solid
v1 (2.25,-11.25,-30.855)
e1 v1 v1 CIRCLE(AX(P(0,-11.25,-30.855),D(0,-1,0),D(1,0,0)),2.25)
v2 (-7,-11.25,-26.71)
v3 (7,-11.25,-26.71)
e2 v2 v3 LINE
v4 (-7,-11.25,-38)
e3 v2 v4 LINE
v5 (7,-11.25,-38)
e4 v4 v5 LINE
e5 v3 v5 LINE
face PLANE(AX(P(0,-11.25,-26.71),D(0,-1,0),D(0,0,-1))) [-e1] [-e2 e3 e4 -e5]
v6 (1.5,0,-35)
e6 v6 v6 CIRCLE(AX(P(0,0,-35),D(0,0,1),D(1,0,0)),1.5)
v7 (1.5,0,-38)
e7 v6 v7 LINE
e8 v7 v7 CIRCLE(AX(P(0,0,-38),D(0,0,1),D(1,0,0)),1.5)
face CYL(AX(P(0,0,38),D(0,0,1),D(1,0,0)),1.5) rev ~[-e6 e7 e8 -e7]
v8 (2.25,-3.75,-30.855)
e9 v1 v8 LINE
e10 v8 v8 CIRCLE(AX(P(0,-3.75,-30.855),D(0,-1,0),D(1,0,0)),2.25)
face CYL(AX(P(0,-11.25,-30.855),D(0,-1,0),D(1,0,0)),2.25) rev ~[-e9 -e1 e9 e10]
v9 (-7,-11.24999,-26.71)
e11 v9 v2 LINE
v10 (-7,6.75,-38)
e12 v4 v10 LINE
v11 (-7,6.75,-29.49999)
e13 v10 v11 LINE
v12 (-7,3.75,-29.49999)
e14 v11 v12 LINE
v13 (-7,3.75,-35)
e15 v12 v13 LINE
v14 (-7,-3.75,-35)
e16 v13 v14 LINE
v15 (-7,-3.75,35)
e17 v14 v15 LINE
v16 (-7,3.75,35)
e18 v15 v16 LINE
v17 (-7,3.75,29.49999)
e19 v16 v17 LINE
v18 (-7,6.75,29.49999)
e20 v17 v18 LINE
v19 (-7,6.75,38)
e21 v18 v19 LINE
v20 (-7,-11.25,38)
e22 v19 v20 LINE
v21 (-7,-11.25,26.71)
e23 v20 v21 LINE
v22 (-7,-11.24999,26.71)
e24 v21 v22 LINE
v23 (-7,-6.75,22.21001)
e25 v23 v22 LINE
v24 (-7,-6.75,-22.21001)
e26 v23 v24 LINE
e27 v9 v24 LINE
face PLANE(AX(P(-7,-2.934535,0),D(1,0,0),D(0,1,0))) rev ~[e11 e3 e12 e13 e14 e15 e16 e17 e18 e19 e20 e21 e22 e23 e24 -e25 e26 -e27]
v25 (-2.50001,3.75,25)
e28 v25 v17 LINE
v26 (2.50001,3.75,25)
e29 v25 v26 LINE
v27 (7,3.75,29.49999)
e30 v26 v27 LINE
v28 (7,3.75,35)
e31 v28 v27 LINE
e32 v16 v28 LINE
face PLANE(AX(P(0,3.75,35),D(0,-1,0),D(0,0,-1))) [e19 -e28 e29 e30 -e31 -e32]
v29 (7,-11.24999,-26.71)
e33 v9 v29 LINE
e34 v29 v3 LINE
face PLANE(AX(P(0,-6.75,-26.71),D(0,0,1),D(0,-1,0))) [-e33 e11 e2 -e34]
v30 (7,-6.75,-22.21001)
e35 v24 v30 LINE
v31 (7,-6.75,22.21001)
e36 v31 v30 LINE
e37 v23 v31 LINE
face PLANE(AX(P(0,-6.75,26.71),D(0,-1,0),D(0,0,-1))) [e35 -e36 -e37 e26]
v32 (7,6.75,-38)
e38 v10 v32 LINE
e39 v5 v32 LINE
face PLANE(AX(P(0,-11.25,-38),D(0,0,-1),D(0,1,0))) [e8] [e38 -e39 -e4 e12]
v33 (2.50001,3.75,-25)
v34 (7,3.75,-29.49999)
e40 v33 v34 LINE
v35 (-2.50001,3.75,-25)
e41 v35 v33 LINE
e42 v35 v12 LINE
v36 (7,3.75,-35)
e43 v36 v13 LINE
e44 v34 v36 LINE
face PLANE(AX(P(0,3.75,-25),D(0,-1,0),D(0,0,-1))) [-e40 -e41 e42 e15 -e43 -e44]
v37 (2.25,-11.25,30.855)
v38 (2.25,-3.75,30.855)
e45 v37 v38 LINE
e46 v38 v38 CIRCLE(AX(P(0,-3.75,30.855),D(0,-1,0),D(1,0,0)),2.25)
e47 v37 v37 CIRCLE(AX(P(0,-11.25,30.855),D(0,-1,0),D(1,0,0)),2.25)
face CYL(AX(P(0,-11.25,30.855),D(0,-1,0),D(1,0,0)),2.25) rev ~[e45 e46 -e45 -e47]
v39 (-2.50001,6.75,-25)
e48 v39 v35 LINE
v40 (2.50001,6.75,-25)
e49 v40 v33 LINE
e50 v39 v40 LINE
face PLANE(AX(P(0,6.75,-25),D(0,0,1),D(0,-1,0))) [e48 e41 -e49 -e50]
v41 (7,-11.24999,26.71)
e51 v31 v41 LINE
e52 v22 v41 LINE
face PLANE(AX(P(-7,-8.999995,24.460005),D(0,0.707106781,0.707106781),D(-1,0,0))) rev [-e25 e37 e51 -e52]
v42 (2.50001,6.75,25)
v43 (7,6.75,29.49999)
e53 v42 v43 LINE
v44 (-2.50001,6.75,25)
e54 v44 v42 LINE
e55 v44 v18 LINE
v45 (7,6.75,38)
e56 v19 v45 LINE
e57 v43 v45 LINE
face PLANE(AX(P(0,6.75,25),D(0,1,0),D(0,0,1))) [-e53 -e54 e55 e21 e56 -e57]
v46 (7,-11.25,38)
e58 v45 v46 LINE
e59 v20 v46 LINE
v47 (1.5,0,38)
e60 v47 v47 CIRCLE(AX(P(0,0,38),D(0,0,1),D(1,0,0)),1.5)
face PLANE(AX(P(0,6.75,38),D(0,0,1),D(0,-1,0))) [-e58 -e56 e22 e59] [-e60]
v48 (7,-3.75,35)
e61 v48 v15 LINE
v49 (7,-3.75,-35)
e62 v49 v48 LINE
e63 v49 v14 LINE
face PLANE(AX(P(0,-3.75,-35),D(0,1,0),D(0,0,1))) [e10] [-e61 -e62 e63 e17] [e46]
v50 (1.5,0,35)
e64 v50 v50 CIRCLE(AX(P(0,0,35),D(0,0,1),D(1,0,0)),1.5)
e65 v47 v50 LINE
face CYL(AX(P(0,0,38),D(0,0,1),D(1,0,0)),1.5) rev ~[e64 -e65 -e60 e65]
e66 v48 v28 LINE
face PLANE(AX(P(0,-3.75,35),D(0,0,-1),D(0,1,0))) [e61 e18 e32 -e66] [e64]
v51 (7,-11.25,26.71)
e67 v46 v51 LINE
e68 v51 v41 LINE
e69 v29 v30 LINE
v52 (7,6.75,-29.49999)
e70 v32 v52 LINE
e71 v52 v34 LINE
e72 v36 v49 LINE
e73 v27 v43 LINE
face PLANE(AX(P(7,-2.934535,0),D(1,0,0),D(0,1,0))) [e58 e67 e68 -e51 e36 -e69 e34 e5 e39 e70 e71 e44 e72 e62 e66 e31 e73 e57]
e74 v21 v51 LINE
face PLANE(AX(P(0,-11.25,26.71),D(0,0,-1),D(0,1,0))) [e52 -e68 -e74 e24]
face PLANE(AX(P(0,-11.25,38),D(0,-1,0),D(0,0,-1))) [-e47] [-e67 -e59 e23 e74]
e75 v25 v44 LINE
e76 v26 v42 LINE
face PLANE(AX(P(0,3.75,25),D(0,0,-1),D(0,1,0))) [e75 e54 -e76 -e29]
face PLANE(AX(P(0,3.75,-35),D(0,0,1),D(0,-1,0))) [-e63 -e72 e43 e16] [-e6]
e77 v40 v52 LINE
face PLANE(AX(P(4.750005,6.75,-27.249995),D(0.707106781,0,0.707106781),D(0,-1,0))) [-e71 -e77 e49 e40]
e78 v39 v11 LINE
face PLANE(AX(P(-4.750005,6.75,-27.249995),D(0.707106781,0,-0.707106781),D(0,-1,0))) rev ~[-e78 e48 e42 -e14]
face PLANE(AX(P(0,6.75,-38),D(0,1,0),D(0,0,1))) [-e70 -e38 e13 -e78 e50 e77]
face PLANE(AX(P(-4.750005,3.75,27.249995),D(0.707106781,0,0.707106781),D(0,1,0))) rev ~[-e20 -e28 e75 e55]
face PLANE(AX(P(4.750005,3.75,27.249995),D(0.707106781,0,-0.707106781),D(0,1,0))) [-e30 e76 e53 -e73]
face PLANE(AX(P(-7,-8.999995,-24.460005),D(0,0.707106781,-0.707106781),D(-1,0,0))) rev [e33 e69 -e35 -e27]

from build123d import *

# Parameters (mm, degrees)
F1_DEPTH = 7
F2_SIZE  = 4.49999
F3_R     = 2.25
F4_DEPTH = 7.5
F5_R     = 1.5
F6_DEPTH = 76.001


# Not quite as in the source:
# - a fillet or chamfer is up to 0.001 mm smaller than in the source, because OpenCascade refuses the exact size


with BuildPart() as f1:
    # F0 (on Right) → F1 (new body, symmetric)
    with BuildSketch(Plane.YZ):
        Polygon((-3.75, 35), (3.75, 35), (3.75, 25), (6.75, 25), (6.75, 38), (-11.25, 38), (-11.25, 26.71), (-6.75, 26.71), (-6.75, -26.71), (-11.25, -26.71), (-11.25, -38), (6.75, -38), (6.75, -25), (3.75, -25), (3.75, -35), (-3.75, -35), align=None)
    extrude(amount=F1_DEPTH, both=True)

    # F2 (size 4.5 in the source; OpenCascade refuses exactly that, so slightly less here)
    f2_edges = [f1.edges().sort_by_distance(p)[0] for p in [
        (0, -6.75, 26.71),
        (0, -6.75, -26.71),
        (-7, 5.25, 25),
        (7, 5.25, 25),
        (-7, 5.25, -25),
        (7, 5.25, -25),
    ]]
    chamfer(f2_edges, length=F2_SIZE)

    # F3 (on face) → F4 (cut, through all)
    with BuildSketch(Plane.XZ.offset(11.25)):
        with Locations((0, 30.855)):
            Circle(F3_R)
        with Locations((0, -30.855)):
            Circle(F3_R)
    extrude(amount=-F4_DEPTH, mode=Mode.SUBTRACT)

    # F5 (on face) → F6 (cut, through all)
    with BuildSketch(Plane.XY.offset(38)):
        Circle(F5_R)
    extrude(amount=-F6_DEPTH, mode=Mode.SUBTRACT)


solid = f1.part
